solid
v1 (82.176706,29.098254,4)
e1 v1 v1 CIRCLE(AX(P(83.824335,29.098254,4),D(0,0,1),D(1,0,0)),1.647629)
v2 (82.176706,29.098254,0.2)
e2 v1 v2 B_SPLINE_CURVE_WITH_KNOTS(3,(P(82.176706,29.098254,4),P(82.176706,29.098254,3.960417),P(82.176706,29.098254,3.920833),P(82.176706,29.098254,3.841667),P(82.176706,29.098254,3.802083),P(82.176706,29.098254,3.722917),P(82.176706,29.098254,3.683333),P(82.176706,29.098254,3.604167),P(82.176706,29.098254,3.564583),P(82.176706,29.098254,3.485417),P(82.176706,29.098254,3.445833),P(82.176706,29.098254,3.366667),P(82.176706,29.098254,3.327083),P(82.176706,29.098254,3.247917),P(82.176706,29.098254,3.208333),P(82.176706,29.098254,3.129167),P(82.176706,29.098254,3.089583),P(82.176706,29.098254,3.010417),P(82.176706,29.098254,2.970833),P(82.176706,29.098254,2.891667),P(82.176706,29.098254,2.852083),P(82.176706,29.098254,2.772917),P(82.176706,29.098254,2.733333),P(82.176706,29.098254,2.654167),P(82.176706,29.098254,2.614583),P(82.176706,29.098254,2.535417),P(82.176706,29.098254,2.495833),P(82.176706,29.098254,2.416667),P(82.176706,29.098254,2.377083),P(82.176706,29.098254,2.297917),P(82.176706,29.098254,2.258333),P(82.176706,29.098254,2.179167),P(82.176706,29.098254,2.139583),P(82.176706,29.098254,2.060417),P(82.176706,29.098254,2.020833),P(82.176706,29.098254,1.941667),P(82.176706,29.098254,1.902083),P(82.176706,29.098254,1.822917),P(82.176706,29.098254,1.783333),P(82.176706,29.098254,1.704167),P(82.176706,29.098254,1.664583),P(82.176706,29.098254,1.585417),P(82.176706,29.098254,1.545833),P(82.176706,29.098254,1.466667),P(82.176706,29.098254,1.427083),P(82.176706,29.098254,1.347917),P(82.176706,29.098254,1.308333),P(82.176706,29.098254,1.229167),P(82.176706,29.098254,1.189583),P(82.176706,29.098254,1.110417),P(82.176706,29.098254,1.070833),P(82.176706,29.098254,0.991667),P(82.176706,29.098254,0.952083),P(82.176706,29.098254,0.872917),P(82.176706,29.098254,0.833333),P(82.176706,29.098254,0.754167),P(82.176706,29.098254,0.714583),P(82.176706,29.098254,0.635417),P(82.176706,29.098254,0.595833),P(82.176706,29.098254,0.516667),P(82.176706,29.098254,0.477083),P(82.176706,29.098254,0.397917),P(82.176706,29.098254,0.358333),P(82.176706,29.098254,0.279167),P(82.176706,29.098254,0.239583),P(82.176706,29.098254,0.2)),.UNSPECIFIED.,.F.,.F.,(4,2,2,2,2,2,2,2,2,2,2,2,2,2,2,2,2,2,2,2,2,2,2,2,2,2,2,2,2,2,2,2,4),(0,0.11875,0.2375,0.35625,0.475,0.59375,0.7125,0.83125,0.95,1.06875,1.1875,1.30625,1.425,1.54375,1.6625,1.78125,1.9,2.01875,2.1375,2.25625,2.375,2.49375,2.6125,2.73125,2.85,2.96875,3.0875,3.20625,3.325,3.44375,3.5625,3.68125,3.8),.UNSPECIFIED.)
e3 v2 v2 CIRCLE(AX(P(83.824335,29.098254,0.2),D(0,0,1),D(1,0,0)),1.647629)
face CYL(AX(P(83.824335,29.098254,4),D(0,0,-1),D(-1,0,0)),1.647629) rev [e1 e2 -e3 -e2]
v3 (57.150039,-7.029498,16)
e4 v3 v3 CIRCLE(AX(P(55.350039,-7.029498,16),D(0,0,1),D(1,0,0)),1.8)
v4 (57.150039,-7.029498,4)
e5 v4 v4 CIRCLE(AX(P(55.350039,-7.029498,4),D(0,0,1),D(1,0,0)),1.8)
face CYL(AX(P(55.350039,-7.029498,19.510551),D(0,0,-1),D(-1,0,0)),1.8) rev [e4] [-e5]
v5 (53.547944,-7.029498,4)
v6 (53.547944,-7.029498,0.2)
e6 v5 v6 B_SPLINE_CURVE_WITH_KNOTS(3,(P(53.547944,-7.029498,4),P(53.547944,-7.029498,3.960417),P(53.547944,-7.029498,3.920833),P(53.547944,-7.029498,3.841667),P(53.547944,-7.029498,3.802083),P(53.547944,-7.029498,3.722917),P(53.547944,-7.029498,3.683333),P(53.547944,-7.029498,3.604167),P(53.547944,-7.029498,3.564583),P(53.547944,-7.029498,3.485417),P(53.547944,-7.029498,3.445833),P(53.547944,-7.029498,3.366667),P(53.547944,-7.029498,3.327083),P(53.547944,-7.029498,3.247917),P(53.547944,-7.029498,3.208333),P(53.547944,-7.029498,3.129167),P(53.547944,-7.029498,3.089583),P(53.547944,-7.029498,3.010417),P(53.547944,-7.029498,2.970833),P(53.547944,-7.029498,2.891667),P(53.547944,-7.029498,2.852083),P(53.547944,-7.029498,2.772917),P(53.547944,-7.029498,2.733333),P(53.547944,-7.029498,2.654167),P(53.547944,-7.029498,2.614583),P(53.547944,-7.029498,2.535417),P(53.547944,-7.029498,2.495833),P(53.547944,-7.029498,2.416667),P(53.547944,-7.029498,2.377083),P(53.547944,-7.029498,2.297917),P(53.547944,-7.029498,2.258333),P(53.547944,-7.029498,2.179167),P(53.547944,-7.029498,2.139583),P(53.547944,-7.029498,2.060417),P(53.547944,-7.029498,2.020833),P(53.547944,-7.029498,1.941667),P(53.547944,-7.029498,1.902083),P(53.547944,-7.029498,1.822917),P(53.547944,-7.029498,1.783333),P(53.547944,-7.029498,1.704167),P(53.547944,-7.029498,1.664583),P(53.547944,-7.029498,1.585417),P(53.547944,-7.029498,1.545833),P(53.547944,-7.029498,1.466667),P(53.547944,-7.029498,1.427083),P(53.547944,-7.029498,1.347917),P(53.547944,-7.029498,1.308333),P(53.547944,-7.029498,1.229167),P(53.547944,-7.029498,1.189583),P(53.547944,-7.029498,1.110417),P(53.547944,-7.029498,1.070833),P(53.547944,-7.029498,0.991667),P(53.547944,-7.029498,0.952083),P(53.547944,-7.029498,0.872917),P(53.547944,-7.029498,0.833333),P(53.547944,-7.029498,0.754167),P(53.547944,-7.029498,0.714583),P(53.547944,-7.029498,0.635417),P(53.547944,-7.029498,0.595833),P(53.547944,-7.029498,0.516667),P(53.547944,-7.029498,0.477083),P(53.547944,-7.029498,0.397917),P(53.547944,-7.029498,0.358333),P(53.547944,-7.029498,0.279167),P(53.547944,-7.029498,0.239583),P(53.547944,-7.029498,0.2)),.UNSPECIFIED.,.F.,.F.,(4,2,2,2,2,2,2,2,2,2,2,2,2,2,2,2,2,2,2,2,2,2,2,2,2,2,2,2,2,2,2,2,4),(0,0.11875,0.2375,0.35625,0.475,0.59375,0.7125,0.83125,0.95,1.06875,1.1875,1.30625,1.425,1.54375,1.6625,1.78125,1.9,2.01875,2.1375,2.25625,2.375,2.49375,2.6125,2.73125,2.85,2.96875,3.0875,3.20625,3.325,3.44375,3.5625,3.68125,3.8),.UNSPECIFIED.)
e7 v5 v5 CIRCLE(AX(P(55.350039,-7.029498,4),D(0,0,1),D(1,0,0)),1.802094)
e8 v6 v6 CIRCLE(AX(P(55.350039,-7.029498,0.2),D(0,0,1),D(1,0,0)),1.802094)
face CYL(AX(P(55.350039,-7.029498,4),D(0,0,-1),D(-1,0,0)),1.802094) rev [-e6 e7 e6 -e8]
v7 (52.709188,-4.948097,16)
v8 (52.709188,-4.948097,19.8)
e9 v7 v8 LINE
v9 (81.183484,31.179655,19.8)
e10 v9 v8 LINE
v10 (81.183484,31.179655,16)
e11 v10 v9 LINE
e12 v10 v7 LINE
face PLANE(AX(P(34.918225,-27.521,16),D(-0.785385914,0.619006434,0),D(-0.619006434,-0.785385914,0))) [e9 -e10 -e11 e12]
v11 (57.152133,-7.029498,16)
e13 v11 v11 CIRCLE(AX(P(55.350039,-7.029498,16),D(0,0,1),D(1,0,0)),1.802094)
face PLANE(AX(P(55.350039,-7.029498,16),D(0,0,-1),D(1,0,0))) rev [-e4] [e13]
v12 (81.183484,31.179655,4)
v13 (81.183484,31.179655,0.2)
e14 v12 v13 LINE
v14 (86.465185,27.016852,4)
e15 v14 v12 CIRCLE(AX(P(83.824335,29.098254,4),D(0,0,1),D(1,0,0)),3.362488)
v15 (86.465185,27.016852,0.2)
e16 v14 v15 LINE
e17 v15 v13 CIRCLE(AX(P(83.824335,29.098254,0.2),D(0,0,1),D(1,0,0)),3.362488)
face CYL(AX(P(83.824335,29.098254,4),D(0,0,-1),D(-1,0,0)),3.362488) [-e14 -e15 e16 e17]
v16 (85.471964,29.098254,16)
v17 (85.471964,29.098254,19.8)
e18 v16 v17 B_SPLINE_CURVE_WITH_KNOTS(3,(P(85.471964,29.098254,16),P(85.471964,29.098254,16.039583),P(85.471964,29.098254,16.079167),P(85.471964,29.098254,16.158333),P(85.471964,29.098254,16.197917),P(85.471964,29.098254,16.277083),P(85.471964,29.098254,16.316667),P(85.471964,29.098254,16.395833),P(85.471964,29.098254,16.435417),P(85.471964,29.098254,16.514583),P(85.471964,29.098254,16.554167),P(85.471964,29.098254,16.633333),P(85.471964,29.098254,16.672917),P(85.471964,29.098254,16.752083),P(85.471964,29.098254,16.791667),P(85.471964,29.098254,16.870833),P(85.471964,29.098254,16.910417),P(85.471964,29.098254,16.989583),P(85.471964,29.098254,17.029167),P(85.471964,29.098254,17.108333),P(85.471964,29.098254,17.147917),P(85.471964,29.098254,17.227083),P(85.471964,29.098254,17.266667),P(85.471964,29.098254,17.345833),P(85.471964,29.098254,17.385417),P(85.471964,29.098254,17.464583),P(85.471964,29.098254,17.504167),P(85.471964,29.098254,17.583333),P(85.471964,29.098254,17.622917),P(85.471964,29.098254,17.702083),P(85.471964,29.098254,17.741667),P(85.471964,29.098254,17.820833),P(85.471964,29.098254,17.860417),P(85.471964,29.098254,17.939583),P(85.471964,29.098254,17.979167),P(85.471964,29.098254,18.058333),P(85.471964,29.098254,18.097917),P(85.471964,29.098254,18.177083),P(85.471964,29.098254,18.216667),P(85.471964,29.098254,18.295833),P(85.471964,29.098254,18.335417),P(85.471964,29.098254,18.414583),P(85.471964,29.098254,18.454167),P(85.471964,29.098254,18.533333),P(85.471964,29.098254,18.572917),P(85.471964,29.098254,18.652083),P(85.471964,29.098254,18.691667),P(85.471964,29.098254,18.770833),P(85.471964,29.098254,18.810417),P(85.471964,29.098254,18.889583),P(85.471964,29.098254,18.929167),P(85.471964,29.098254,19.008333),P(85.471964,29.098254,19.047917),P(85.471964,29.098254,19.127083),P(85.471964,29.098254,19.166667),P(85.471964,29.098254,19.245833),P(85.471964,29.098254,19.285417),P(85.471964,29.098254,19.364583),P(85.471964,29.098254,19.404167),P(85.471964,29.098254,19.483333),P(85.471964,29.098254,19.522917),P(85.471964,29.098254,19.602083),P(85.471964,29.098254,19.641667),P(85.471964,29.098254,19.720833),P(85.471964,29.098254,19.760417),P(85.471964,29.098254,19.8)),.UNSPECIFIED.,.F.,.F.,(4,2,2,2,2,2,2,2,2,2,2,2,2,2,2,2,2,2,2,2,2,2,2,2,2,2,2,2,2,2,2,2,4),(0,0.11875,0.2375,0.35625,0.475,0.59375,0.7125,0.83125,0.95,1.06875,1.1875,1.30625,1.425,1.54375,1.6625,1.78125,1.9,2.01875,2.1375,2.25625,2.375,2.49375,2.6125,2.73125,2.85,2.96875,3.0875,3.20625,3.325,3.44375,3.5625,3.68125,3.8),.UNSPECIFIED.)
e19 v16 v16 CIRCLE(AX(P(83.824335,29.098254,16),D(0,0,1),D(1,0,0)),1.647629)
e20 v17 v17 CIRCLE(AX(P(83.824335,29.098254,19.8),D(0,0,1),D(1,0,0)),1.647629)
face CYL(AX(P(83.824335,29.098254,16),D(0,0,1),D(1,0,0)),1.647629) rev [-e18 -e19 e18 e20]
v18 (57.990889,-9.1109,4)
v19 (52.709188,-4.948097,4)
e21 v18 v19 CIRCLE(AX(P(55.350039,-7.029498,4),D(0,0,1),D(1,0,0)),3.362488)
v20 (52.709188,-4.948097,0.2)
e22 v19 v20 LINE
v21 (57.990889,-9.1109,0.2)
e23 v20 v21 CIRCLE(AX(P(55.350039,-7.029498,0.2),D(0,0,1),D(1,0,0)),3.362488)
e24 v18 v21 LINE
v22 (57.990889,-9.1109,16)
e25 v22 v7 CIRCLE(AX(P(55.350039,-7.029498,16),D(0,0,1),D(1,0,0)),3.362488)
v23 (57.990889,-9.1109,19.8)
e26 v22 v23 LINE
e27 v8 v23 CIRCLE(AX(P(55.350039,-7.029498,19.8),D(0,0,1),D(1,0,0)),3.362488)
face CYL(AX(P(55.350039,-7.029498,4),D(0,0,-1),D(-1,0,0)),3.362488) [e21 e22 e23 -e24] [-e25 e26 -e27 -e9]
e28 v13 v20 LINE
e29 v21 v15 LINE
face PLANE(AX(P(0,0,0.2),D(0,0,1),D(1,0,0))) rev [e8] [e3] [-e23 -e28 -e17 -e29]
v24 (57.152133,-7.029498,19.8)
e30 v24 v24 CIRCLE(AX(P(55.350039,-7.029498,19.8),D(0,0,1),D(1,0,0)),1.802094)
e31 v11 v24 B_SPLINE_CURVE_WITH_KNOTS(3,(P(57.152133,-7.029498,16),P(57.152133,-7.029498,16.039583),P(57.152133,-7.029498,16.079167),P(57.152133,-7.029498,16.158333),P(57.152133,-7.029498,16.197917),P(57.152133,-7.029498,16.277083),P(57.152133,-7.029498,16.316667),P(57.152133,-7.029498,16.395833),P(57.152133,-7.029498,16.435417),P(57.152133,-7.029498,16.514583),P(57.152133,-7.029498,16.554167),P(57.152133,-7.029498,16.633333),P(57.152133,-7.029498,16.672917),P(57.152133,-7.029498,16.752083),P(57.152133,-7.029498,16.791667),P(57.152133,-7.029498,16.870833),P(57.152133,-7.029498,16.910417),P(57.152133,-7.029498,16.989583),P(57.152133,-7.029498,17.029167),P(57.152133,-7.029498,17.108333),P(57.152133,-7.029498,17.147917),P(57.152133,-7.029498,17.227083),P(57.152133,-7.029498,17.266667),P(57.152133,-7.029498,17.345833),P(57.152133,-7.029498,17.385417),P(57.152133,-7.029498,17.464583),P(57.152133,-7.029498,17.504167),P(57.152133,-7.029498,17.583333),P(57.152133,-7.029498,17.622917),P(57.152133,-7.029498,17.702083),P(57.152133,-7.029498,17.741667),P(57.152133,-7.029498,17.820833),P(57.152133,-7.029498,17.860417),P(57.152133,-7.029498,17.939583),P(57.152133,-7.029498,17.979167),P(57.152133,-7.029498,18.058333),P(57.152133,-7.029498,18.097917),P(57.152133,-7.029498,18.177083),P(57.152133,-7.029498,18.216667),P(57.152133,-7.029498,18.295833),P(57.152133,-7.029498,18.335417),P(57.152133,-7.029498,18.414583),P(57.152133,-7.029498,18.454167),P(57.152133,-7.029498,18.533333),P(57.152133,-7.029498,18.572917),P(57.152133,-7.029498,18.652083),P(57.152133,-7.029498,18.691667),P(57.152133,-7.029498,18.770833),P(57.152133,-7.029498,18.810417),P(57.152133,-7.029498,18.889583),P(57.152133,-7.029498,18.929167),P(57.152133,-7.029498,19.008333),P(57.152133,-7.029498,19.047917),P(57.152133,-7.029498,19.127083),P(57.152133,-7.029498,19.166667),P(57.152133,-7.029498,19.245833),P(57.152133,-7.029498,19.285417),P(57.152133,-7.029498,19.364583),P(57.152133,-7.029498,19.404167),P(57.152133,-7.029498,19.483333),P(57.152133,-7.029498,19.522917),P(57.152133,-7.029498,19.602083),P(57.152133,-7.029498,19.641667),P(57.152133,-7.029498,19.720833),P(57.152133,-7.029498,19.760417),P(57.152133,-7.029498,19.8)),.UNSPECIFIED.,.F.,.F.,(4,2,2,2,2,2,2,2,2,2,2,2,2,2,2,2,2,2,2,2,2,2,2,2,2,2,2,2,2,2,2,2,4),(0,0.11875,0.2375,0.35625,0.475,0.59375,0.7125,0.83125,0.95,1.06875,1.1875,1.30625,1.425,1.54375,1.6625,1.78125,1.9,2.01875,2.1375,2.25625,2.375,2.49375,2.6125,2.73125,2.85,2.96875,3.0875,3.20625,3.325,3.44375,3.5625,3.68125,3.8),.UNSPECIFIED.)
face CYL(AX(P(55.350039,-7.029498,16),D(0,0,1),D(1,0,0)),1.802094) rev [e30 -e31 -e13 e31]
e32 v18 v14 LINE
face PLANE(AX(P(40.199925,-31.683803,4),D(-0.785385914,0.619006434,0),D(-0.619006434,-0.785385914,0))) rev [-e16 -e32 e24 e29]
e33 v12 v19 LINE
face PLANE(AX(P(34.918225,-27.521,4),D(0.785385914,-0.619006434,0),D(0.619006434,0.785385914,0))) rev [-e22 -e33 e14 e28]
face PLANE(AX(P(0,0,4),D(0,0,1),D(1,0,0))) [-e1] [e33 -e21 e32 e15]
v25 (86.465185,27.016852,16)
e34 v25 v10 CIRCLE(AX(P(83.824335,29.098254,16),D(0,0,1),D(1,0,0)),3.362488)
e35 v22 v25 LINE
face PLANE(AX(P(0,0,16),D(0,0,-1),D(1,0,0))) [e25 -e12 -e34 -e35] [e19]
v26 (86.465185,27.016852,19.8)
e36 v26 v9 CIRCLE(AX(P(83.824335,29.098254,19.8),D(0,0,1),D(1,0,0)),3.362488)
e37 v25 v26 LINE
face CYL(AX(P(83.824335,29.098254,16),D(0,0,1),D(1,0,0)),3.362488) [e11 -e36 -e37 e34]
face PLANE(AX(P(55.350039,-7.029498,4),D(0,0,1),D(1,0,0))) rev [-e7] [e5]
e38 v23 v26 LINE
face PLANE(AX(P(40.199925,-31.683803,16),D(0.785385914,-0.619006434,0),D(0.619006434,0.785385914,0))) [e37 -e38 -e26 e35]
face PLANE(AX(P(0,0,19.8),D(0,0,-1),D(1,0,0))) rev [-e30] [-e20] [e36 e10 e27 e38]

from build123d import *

# Parameters (mm, degrees)
SALIENTE_EXTRUIR1_START       = 0.2
SALIENTE_EXTRUIR1_OUTLINE_R   = 1.802094284
SALIENTE_EXTRUIR1_OUTLINE_R_2 = 1.64762906
SALIENTE_EXTRUIR1_DEPTH       = 3.8
CROQUIS2_R                    = 3.36248758
CROQUIS2_R_2                  = 1.8
SALIENTE_EXTRUIR2_DEPTH       = 6
SIMETR_A5_COPY_1_SKETCH_R     = 3.36248758
SIMETR_A5_COPY_1_SKETCH_R_2   = 1.8
SIMETR_A5_COPY_1_DEPTH        = 6
SIMETR_A5_COPY_2_SKETCH_R     = 3.36248758
SIMETR_A5_COPY_2_SKETCH_R_2   = 1.8
SIMETR_A5_COPY_2_DEPTH        = 6


# Read off the part's stored shape, not the designer's step: Saliente-Extruir1
with BuildPart() as part:
    # Saliente-Extruir1 outline → Saliente-Extruir1 (new body)
    with BuildSketch(Plane.XY.offset(SALIENTE_EXTRUIR1_START)):
        with BuildLine():
            Line((57.990889124, -9.110899758), (86.465185089, 27.016852307))
            ThreePointArc((86.465185089, 27.016852307), (85.905736152, 31.739104142), (81.183484317, 31.179655205))
            Line((81.183484317, 31.179655205), (52.709188351, -4.94809686))
            ThreePointArc((52.709188351, -4.94809686), (53.268637289, -9.670348695), (57.990889124, -9.110899758))
        make_face()
        with Locations((55.350038738, -7.029498309)):
            Circle(SALIENTE_EXTRUIR1_OUTLINE_R, mode=Mode.SUBTRACT)
        with Locations((83.824334703, 29.098253756)):
            Circle(SALIENTE_EXTRUIR1_OUTLINE_R_2, mode=Mode.SUBTRACT)
    saliente_extruir1 = extrude(amount=SALIENTE_EXTRUIR1_DEPTH)

    # Croquis2 → Saliente-Extruir2 (add)
    with BuildSketch(Plane.XY.offset(4)):
        with Locations(Location((55.350038738, -7.029498309, 0), (0, 0, 141.756384729))):
            Circle(CROQUIS2_R)
        with Locations((55.350038738, -7.029498309)):
            Circle(CROQUIS2_R_2, mode=Mode.SUBTRACT)
    saliente_extruir2 = extrude(amount=SALIENTE_EXTRUIR2_DEPTH)

    # Simetría4: Saliente-Extruir2 across plane
    add(saliente_extruir2.mirror(Plane.XY.offset(10)))

    # Simetría5: Saliente-Extruir1 across plane
    add(saliente_extruir1.mirror(Plane.XY.offset(10)))

    # Simetría5 copy 1 sketch → Simetría5 copy 1 (add)
    with BuildSketch(Plane.XY.offset(4)):
        with Locations(Location((55.350038738, -7.029498309, 0), (0, 0, 141.756384729))):
            Circle(SIMETR_A5_COPY_1_SKETCH_R)
        with Locations((55.350038738, -7.029498309)):
            Circle(SIMETR_A5_COPY_1_SKETCH_R_2, mode=Mode.SUBTRACT)
    extrude(amount=SIMETR_A5_COPY_1_DEPTH)

    # Simetría5 copy 2 sketch → Simetría5 copy 2 (add)
    with BuildSketch(Plane(origin=(0, 0, 16), x_dir=(1, 0, 0), z_dir=(0, 0, -1))):
        with Locations((55.350038738, 7.029498309)):
            Circle(SIMETR_A5_COPY_2_SKETCH_R)
        with Locations((55.350038738, 7.029498309)):
            Circle(SIMETR_A5_COPY_2_SKETCH_R_2, mode=Mode.SUBTRACT)
    extrude(amount=SIMETR_A5_COPY_2_DEPTH)


solid = part.part
